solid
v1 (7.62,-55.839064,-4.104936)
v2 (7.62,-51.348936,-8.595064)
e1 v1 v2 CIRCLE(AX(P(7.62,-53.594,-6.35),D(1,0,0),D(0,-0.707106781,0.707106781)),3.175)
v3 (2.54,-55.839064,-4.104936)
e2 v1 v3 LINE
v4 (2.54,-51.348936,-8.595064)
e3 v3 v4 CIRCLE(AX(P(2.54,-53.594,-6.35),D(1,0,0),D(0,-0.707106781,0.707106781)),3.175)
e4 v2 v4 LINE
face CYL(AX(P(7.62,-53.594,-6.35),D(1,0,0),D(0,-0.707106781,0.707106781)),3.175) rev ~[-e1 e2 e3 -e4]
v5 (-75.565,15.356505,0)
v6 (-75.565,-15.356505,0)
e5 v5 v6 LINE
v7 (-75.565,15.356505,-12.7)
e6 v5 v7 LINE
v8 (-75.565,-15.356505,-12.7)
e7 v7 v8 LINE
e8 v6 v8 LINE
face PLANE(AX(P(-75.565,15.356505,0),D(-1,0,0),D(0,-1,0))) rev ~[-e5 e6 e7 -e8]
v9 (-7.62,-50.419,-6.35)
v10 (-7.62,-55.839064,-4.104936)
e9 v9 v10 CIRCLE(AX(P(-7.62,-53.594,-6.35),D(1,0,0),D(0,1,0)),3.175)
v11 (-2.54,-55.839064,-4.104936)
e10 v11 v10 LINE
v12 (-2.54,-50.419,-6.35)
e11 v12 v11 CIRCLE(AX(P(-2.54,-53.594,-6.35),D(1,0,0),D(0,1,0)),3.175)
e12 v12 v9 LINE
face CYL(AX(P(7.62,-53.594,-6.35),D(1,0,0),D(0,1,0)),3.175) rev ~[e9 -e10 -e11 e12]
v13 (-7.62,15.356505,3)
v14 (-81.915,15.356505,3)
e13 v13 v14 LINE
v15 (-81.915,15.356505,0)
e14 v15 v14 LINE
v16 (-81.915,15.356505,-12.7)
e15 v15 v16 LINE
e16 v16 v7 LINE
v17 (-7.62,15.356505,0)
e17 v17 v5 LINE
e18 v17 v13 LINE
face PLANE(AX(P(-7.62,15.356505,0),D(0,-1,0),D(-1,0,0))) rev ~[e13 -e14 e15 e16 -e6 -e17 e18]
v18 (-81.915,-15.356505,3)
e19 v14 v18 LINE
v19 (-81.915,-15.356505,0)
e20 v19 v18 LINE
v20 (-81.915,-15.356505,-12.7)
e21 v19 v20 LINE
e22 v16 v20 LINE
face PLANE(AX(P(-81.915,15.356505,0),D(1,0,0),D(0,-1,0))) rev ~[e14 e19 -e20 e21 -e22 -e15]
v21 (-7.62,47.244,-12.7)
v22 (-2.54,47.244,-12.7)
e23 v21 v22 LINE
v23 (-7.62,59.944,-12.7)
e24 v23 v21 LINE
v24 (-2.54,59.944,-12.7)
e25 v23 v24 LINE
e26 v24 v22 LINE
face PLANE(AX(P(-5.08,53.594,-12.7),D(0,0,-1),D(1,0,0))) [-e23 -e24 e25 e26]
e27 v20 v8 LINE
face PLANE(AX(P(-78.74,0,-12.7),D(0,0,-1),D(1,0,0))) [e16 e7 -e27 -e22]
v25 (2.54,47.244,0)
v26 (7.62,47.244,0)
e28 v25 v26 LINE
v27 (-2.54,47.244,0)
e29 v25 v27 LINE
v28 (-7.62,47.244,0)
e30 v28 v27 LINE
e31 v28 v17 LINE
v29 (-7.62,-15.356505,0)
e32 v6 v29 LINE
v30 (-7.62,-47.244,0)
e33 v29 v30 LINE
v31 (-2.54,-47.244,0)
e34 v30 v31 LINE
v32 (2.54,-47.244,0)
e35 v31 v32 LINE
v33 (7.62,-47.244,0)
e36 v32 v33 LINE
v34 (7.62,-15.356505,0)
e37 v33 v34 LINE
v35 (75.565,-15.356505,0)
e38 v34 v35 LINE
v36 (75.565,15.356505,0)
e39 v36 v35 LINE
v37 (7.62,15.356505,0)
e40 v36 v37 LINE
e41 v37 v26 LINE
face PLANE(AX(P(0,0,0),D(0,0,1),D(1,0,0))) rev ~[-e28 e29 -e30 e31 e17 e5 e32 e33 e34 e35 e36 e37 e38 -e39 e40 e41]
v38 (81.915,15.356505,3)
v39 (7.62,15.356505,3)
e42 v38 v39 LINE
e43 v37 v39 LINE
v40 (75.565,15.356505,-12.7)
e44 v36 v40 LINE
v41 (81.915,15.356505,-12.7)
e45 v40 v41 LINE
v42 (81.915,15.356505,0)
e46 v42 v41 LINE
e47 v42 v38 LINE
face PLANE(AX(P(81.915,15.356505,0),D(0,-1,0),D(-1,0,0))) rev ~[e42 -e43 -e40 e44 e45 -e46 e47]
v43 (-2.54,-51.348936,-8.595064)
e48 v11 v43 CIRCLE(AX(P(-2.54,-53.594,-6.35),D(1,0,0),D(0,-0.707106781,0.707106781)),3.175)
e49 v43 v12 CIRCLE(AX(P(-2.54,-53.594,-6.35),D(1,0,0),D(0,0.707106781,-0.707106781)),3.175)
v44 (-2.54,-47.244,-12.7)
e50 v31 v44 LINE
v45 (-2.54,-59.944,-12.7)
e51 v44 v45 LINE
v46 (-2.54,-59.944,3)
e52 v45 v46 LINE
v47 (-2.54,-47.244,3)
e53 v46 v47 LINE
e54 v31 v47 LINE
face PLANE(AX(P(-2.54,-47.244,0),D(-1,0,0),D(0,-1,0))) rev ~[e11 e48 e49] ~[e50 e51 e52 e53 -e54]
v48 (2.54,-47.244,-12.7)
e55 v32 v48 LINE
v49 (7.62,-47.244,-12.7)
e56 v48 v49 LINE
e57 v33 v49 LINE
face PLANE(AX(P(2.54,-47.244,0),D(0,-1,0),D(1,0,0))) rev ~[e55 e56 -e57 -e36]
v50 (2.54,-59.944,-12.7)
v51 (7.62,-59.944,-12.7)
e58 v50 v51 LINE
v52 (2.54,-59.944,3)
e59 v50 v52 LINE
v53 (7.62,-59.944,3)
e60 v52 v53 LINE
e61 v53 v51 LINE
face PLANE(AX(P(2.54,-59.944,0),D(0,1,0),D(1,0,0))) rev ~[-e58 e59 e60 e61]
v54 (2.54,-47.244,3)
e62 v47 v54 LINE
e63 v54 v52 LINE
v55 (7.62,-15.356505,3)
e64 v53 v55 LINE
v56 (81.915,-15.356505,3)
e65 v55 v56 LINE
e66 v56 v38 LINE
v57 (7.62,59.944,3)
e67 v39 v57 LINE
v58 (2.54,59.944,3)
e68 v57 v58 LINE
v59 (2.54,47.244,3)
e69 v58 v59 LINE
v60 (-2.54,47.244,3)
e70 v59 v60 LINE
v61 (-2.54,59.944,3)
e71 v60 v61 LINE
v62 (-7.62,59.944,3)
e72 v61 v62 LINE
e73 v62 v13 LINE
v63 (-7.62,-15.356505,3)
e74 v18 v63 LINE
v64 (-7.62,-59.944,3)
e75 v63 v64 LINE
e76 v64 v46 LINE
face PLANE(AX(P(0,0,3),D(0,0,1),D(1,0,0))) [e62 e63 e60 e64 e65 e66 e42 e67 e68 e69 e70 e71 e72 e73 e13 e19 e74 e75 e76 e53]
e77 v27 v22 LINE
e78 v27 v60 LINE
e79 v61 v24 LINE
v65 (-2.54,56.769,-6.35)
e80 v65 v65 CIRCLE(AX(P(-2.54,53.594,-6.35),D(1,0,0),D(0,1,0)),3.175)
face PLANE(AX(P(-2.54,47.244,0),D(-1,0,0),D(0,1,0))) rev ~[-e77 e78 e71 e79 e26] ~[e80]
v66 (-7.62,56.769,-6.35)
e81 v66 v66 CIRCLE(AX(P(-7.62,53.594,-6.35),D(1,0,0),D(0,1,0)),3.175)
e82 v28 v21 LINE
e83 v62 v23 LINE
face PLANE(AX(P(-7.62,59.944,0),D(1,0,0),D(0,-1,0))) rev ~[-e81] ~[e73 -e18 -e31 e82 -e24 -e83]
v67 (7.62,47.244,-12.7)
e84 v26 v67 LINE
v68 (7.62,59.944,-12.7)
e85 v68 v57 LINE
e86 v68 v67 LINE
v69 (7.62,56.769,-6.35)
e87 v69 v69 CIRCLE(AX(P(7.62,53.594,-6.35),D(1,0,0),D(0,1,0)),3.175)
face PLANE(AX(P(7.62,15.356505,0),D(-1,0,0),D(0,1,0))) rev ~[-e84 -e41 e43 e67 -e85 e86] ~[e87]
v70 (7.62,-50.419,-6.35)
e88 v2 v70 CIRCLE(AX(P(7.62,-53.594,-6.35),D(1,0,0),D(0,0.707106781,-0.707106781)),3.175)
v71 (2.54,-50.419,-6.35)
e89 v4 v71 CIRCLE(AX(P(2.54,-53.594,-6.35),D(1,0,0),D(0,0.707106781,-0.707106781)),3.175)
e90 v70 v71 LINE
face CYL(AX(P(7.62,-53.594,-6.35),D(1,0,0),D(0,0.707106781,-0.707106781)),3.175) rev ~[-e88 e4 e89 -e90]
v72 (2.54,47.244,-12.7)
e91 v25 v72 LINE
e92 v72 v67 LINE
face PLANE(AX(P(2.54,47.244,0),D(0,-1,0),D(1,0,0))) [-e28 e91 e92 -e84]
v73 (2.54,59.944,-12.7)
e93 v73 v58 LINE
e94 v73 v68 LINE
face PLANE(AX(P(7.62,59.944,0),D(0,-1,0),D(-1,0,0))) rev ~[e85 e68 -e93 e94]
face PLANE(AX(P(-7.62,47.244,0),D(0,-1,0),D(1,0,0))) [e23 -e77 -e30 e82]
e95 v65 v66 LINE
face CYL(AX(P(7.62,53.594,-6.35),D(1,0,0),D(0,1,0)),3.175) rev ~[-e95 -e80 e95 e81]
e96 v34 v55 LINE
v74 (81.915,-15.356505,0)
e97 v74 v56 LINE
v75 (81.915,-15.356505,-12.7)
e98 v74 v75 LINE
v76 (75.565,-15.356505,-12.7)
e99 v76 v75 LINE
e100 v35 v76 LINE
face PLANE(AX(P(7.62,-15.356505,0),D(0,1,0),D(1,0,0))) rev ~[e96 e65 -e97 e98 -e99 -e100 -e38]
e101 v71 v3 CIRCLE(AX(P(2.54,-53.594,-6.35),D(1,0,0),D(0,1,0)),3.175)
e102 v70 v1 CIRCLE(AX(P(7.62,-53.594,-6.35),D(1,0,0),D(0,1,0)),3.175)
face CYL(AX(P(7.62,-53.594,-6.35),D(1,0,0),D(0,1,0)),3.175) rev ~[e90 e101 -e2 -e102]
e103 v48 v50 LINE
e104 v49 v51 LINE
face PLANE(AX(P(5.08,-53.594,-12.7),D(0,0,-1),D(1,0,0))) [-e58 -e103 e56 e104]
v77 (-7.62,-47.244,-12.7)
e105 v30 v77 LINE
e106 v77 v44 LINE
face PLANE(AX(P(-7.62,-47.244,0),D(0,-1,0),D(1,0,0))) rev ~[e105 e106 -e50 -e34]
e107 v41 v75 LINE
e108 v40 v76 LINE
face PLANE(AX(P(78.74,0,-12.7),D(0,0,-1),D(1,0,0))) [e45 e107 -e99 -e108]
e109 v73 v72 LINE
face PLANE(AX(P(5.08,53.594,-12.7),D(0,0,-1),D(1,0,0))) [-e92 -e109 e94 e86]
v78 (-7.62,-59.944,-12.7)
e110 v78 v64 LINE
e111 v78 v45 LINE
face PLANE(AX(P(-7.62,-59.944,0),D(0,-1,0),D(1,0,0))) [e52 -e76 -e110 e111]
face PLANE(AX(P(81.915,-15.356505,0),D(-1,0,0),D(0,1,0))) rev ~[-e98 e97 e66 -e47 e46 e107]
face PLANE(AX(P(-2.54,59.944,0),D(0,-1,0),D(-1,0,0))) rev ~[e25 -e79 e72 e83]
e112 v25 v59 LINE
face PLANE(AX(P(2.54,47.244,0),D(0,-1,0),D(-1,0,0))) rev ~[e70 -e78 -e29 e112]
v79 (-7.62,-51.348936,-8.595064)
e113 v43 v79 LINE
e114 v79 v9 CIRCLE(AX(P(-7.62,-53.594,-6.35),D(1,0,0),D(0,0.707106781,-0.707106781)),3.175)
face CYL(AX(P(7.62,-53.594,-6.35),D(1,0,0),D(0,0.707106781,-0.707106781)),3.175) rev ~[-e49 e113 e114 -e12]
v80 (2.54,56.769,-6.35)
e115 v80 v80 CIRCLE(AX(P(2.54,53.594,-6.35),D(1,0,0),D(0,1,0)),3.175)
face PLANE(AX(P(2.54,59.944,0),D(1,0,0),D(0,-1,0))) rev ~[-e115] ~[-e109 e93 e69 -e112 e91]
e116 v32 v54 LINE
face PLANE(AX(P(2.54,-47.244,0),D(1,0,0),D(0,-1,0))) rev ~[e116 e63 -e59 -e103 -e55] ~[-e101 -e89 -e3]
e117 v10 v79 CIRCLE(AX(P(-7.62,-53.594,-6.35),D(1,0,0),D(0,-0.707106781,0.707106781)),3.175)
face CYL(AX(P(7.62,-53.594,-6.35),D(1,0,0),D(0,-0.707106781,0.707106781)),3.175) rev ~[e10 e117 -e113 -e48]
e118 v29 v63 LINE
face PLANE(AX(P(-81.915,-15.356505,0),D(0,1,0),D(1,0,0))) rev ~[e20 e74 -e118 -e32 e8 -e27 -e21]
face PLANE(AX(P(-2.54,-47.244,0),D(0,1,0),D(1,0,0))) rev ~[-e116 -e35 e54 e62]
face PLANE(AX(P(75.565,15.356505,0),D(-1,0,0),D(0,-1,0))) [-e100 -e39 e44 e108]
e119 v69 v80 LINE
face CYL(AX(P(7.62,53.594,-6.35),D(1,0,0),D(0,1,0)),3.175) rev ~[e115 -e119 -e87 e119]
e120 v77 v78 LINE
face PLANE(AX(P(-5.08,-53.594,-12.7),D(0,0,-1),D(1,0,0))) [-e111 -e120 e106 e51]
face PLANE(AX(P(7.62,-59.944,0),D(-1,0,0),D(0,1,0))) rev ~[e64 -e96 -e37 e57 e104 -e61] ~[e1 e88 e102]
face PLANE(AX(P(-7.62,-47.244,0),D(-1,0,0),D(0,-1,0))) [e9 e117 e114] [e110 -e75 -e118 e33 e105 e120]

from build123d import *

# Parameters (mm, degrees)
F1_DEPTH = 3
F2_W     = 5.08
F2_H     = 12.7
F2_W_2   = 6.35
F2_H_2   = 30.7130107253
F3_DEPTH = 12.7
F4_R     = 3.175
F5_DEPTH = 25.4


with BuildPart() as f1:
    # F0 (on Top) → F1 (new body)
    with BuildSketch(Plane.XY):
        Polygon((-2.54, 59.944), (-7.62, 59.944), (-7.62, 15.3565053627), (-81.915, 15.3565053627), (-81.915, -15.3565053627), (-7.62, -15.3565053627), (-7.62, -59.944), (-2.54, -59.944), (-2.54, -53.594), (-2.54, -47.244), (2.54, -47.244), (2.54, -59.944), (2.8766005316, -59.944), (6.35, -59.944), (7.62, -59.944), (7.62, -15.3565053627), (81.915, -15.3565053627), (81.915, 15.3565053627), (7.62, 15.3565053627), (7.62, 59.944), (6.35, 59.944), (2.8766005316, 59.944), (2.54, 59.944), (2.54, 47.244), (-2.54, 47.244), (-2.54, 53.594), align=None)
    extrude(amount=F1_DEPTH)

    # F2 (on face) → F3 (join)
    with BuildSketch(Plane(origin=(0, 0, 0), x_dir=(1, 0, 0), z_dir=(0, 0, -1))):
        with Locations((-5.08, 53.594)):
            Rectangle(F2_W, F2_H)
        with Locations((5.08, 53.594)):
            Rectangle(F2_W, F2_H)
        with Locations((78.74, 0)):
            Rectangle(F2_W_2, F2_H_2)
        with Locations((5.08, -53.594)):
            Rectangle(F2_W, F2_H)
        with Locations((-5.08, -53.594)):
            Rectangle(F2_W, F2_H)
        with Locations((-78.74, 0)):
            Rectangle(F2_W_2, F2_H_2)
    extrude(amount=F3_DEPTH)

    # F4 (on face) → F5 (cut)
    with BuildSketch(Plane.YZ.offset(7.62)):
        with Locations((53.594, -6.35)):
            Circle(F4_R)
        with BuildLine():
            Line((-55.8390640303, -4.1049359697), (-51.3489359697, -8.5950640303))
            ThreePointArc((-51.3489359697, -8.5950640303), (-50.6606824843, -7.5650198978), (-50.419, -6.35))
            ThreePointArc((-50.419, -6.35), (-52.3789801022, -3.4166824843), (-55.8390640303, -4.1049359697))
        make_face()
        with BuildLine():
            ThreePointArc((-55.8390640303, -4.1049359697), (-55.8390640303, -8.5950640303), (-51.3489359697, -8.5950640303))
            Line((-51.3489359697, -8.5950640303), (-55.8390640303, -4.1049359697))
        make_face()
    extrude(amount=-F5_DEPTH, mode=Mode.SUBTRACT)


solid = f1.part
